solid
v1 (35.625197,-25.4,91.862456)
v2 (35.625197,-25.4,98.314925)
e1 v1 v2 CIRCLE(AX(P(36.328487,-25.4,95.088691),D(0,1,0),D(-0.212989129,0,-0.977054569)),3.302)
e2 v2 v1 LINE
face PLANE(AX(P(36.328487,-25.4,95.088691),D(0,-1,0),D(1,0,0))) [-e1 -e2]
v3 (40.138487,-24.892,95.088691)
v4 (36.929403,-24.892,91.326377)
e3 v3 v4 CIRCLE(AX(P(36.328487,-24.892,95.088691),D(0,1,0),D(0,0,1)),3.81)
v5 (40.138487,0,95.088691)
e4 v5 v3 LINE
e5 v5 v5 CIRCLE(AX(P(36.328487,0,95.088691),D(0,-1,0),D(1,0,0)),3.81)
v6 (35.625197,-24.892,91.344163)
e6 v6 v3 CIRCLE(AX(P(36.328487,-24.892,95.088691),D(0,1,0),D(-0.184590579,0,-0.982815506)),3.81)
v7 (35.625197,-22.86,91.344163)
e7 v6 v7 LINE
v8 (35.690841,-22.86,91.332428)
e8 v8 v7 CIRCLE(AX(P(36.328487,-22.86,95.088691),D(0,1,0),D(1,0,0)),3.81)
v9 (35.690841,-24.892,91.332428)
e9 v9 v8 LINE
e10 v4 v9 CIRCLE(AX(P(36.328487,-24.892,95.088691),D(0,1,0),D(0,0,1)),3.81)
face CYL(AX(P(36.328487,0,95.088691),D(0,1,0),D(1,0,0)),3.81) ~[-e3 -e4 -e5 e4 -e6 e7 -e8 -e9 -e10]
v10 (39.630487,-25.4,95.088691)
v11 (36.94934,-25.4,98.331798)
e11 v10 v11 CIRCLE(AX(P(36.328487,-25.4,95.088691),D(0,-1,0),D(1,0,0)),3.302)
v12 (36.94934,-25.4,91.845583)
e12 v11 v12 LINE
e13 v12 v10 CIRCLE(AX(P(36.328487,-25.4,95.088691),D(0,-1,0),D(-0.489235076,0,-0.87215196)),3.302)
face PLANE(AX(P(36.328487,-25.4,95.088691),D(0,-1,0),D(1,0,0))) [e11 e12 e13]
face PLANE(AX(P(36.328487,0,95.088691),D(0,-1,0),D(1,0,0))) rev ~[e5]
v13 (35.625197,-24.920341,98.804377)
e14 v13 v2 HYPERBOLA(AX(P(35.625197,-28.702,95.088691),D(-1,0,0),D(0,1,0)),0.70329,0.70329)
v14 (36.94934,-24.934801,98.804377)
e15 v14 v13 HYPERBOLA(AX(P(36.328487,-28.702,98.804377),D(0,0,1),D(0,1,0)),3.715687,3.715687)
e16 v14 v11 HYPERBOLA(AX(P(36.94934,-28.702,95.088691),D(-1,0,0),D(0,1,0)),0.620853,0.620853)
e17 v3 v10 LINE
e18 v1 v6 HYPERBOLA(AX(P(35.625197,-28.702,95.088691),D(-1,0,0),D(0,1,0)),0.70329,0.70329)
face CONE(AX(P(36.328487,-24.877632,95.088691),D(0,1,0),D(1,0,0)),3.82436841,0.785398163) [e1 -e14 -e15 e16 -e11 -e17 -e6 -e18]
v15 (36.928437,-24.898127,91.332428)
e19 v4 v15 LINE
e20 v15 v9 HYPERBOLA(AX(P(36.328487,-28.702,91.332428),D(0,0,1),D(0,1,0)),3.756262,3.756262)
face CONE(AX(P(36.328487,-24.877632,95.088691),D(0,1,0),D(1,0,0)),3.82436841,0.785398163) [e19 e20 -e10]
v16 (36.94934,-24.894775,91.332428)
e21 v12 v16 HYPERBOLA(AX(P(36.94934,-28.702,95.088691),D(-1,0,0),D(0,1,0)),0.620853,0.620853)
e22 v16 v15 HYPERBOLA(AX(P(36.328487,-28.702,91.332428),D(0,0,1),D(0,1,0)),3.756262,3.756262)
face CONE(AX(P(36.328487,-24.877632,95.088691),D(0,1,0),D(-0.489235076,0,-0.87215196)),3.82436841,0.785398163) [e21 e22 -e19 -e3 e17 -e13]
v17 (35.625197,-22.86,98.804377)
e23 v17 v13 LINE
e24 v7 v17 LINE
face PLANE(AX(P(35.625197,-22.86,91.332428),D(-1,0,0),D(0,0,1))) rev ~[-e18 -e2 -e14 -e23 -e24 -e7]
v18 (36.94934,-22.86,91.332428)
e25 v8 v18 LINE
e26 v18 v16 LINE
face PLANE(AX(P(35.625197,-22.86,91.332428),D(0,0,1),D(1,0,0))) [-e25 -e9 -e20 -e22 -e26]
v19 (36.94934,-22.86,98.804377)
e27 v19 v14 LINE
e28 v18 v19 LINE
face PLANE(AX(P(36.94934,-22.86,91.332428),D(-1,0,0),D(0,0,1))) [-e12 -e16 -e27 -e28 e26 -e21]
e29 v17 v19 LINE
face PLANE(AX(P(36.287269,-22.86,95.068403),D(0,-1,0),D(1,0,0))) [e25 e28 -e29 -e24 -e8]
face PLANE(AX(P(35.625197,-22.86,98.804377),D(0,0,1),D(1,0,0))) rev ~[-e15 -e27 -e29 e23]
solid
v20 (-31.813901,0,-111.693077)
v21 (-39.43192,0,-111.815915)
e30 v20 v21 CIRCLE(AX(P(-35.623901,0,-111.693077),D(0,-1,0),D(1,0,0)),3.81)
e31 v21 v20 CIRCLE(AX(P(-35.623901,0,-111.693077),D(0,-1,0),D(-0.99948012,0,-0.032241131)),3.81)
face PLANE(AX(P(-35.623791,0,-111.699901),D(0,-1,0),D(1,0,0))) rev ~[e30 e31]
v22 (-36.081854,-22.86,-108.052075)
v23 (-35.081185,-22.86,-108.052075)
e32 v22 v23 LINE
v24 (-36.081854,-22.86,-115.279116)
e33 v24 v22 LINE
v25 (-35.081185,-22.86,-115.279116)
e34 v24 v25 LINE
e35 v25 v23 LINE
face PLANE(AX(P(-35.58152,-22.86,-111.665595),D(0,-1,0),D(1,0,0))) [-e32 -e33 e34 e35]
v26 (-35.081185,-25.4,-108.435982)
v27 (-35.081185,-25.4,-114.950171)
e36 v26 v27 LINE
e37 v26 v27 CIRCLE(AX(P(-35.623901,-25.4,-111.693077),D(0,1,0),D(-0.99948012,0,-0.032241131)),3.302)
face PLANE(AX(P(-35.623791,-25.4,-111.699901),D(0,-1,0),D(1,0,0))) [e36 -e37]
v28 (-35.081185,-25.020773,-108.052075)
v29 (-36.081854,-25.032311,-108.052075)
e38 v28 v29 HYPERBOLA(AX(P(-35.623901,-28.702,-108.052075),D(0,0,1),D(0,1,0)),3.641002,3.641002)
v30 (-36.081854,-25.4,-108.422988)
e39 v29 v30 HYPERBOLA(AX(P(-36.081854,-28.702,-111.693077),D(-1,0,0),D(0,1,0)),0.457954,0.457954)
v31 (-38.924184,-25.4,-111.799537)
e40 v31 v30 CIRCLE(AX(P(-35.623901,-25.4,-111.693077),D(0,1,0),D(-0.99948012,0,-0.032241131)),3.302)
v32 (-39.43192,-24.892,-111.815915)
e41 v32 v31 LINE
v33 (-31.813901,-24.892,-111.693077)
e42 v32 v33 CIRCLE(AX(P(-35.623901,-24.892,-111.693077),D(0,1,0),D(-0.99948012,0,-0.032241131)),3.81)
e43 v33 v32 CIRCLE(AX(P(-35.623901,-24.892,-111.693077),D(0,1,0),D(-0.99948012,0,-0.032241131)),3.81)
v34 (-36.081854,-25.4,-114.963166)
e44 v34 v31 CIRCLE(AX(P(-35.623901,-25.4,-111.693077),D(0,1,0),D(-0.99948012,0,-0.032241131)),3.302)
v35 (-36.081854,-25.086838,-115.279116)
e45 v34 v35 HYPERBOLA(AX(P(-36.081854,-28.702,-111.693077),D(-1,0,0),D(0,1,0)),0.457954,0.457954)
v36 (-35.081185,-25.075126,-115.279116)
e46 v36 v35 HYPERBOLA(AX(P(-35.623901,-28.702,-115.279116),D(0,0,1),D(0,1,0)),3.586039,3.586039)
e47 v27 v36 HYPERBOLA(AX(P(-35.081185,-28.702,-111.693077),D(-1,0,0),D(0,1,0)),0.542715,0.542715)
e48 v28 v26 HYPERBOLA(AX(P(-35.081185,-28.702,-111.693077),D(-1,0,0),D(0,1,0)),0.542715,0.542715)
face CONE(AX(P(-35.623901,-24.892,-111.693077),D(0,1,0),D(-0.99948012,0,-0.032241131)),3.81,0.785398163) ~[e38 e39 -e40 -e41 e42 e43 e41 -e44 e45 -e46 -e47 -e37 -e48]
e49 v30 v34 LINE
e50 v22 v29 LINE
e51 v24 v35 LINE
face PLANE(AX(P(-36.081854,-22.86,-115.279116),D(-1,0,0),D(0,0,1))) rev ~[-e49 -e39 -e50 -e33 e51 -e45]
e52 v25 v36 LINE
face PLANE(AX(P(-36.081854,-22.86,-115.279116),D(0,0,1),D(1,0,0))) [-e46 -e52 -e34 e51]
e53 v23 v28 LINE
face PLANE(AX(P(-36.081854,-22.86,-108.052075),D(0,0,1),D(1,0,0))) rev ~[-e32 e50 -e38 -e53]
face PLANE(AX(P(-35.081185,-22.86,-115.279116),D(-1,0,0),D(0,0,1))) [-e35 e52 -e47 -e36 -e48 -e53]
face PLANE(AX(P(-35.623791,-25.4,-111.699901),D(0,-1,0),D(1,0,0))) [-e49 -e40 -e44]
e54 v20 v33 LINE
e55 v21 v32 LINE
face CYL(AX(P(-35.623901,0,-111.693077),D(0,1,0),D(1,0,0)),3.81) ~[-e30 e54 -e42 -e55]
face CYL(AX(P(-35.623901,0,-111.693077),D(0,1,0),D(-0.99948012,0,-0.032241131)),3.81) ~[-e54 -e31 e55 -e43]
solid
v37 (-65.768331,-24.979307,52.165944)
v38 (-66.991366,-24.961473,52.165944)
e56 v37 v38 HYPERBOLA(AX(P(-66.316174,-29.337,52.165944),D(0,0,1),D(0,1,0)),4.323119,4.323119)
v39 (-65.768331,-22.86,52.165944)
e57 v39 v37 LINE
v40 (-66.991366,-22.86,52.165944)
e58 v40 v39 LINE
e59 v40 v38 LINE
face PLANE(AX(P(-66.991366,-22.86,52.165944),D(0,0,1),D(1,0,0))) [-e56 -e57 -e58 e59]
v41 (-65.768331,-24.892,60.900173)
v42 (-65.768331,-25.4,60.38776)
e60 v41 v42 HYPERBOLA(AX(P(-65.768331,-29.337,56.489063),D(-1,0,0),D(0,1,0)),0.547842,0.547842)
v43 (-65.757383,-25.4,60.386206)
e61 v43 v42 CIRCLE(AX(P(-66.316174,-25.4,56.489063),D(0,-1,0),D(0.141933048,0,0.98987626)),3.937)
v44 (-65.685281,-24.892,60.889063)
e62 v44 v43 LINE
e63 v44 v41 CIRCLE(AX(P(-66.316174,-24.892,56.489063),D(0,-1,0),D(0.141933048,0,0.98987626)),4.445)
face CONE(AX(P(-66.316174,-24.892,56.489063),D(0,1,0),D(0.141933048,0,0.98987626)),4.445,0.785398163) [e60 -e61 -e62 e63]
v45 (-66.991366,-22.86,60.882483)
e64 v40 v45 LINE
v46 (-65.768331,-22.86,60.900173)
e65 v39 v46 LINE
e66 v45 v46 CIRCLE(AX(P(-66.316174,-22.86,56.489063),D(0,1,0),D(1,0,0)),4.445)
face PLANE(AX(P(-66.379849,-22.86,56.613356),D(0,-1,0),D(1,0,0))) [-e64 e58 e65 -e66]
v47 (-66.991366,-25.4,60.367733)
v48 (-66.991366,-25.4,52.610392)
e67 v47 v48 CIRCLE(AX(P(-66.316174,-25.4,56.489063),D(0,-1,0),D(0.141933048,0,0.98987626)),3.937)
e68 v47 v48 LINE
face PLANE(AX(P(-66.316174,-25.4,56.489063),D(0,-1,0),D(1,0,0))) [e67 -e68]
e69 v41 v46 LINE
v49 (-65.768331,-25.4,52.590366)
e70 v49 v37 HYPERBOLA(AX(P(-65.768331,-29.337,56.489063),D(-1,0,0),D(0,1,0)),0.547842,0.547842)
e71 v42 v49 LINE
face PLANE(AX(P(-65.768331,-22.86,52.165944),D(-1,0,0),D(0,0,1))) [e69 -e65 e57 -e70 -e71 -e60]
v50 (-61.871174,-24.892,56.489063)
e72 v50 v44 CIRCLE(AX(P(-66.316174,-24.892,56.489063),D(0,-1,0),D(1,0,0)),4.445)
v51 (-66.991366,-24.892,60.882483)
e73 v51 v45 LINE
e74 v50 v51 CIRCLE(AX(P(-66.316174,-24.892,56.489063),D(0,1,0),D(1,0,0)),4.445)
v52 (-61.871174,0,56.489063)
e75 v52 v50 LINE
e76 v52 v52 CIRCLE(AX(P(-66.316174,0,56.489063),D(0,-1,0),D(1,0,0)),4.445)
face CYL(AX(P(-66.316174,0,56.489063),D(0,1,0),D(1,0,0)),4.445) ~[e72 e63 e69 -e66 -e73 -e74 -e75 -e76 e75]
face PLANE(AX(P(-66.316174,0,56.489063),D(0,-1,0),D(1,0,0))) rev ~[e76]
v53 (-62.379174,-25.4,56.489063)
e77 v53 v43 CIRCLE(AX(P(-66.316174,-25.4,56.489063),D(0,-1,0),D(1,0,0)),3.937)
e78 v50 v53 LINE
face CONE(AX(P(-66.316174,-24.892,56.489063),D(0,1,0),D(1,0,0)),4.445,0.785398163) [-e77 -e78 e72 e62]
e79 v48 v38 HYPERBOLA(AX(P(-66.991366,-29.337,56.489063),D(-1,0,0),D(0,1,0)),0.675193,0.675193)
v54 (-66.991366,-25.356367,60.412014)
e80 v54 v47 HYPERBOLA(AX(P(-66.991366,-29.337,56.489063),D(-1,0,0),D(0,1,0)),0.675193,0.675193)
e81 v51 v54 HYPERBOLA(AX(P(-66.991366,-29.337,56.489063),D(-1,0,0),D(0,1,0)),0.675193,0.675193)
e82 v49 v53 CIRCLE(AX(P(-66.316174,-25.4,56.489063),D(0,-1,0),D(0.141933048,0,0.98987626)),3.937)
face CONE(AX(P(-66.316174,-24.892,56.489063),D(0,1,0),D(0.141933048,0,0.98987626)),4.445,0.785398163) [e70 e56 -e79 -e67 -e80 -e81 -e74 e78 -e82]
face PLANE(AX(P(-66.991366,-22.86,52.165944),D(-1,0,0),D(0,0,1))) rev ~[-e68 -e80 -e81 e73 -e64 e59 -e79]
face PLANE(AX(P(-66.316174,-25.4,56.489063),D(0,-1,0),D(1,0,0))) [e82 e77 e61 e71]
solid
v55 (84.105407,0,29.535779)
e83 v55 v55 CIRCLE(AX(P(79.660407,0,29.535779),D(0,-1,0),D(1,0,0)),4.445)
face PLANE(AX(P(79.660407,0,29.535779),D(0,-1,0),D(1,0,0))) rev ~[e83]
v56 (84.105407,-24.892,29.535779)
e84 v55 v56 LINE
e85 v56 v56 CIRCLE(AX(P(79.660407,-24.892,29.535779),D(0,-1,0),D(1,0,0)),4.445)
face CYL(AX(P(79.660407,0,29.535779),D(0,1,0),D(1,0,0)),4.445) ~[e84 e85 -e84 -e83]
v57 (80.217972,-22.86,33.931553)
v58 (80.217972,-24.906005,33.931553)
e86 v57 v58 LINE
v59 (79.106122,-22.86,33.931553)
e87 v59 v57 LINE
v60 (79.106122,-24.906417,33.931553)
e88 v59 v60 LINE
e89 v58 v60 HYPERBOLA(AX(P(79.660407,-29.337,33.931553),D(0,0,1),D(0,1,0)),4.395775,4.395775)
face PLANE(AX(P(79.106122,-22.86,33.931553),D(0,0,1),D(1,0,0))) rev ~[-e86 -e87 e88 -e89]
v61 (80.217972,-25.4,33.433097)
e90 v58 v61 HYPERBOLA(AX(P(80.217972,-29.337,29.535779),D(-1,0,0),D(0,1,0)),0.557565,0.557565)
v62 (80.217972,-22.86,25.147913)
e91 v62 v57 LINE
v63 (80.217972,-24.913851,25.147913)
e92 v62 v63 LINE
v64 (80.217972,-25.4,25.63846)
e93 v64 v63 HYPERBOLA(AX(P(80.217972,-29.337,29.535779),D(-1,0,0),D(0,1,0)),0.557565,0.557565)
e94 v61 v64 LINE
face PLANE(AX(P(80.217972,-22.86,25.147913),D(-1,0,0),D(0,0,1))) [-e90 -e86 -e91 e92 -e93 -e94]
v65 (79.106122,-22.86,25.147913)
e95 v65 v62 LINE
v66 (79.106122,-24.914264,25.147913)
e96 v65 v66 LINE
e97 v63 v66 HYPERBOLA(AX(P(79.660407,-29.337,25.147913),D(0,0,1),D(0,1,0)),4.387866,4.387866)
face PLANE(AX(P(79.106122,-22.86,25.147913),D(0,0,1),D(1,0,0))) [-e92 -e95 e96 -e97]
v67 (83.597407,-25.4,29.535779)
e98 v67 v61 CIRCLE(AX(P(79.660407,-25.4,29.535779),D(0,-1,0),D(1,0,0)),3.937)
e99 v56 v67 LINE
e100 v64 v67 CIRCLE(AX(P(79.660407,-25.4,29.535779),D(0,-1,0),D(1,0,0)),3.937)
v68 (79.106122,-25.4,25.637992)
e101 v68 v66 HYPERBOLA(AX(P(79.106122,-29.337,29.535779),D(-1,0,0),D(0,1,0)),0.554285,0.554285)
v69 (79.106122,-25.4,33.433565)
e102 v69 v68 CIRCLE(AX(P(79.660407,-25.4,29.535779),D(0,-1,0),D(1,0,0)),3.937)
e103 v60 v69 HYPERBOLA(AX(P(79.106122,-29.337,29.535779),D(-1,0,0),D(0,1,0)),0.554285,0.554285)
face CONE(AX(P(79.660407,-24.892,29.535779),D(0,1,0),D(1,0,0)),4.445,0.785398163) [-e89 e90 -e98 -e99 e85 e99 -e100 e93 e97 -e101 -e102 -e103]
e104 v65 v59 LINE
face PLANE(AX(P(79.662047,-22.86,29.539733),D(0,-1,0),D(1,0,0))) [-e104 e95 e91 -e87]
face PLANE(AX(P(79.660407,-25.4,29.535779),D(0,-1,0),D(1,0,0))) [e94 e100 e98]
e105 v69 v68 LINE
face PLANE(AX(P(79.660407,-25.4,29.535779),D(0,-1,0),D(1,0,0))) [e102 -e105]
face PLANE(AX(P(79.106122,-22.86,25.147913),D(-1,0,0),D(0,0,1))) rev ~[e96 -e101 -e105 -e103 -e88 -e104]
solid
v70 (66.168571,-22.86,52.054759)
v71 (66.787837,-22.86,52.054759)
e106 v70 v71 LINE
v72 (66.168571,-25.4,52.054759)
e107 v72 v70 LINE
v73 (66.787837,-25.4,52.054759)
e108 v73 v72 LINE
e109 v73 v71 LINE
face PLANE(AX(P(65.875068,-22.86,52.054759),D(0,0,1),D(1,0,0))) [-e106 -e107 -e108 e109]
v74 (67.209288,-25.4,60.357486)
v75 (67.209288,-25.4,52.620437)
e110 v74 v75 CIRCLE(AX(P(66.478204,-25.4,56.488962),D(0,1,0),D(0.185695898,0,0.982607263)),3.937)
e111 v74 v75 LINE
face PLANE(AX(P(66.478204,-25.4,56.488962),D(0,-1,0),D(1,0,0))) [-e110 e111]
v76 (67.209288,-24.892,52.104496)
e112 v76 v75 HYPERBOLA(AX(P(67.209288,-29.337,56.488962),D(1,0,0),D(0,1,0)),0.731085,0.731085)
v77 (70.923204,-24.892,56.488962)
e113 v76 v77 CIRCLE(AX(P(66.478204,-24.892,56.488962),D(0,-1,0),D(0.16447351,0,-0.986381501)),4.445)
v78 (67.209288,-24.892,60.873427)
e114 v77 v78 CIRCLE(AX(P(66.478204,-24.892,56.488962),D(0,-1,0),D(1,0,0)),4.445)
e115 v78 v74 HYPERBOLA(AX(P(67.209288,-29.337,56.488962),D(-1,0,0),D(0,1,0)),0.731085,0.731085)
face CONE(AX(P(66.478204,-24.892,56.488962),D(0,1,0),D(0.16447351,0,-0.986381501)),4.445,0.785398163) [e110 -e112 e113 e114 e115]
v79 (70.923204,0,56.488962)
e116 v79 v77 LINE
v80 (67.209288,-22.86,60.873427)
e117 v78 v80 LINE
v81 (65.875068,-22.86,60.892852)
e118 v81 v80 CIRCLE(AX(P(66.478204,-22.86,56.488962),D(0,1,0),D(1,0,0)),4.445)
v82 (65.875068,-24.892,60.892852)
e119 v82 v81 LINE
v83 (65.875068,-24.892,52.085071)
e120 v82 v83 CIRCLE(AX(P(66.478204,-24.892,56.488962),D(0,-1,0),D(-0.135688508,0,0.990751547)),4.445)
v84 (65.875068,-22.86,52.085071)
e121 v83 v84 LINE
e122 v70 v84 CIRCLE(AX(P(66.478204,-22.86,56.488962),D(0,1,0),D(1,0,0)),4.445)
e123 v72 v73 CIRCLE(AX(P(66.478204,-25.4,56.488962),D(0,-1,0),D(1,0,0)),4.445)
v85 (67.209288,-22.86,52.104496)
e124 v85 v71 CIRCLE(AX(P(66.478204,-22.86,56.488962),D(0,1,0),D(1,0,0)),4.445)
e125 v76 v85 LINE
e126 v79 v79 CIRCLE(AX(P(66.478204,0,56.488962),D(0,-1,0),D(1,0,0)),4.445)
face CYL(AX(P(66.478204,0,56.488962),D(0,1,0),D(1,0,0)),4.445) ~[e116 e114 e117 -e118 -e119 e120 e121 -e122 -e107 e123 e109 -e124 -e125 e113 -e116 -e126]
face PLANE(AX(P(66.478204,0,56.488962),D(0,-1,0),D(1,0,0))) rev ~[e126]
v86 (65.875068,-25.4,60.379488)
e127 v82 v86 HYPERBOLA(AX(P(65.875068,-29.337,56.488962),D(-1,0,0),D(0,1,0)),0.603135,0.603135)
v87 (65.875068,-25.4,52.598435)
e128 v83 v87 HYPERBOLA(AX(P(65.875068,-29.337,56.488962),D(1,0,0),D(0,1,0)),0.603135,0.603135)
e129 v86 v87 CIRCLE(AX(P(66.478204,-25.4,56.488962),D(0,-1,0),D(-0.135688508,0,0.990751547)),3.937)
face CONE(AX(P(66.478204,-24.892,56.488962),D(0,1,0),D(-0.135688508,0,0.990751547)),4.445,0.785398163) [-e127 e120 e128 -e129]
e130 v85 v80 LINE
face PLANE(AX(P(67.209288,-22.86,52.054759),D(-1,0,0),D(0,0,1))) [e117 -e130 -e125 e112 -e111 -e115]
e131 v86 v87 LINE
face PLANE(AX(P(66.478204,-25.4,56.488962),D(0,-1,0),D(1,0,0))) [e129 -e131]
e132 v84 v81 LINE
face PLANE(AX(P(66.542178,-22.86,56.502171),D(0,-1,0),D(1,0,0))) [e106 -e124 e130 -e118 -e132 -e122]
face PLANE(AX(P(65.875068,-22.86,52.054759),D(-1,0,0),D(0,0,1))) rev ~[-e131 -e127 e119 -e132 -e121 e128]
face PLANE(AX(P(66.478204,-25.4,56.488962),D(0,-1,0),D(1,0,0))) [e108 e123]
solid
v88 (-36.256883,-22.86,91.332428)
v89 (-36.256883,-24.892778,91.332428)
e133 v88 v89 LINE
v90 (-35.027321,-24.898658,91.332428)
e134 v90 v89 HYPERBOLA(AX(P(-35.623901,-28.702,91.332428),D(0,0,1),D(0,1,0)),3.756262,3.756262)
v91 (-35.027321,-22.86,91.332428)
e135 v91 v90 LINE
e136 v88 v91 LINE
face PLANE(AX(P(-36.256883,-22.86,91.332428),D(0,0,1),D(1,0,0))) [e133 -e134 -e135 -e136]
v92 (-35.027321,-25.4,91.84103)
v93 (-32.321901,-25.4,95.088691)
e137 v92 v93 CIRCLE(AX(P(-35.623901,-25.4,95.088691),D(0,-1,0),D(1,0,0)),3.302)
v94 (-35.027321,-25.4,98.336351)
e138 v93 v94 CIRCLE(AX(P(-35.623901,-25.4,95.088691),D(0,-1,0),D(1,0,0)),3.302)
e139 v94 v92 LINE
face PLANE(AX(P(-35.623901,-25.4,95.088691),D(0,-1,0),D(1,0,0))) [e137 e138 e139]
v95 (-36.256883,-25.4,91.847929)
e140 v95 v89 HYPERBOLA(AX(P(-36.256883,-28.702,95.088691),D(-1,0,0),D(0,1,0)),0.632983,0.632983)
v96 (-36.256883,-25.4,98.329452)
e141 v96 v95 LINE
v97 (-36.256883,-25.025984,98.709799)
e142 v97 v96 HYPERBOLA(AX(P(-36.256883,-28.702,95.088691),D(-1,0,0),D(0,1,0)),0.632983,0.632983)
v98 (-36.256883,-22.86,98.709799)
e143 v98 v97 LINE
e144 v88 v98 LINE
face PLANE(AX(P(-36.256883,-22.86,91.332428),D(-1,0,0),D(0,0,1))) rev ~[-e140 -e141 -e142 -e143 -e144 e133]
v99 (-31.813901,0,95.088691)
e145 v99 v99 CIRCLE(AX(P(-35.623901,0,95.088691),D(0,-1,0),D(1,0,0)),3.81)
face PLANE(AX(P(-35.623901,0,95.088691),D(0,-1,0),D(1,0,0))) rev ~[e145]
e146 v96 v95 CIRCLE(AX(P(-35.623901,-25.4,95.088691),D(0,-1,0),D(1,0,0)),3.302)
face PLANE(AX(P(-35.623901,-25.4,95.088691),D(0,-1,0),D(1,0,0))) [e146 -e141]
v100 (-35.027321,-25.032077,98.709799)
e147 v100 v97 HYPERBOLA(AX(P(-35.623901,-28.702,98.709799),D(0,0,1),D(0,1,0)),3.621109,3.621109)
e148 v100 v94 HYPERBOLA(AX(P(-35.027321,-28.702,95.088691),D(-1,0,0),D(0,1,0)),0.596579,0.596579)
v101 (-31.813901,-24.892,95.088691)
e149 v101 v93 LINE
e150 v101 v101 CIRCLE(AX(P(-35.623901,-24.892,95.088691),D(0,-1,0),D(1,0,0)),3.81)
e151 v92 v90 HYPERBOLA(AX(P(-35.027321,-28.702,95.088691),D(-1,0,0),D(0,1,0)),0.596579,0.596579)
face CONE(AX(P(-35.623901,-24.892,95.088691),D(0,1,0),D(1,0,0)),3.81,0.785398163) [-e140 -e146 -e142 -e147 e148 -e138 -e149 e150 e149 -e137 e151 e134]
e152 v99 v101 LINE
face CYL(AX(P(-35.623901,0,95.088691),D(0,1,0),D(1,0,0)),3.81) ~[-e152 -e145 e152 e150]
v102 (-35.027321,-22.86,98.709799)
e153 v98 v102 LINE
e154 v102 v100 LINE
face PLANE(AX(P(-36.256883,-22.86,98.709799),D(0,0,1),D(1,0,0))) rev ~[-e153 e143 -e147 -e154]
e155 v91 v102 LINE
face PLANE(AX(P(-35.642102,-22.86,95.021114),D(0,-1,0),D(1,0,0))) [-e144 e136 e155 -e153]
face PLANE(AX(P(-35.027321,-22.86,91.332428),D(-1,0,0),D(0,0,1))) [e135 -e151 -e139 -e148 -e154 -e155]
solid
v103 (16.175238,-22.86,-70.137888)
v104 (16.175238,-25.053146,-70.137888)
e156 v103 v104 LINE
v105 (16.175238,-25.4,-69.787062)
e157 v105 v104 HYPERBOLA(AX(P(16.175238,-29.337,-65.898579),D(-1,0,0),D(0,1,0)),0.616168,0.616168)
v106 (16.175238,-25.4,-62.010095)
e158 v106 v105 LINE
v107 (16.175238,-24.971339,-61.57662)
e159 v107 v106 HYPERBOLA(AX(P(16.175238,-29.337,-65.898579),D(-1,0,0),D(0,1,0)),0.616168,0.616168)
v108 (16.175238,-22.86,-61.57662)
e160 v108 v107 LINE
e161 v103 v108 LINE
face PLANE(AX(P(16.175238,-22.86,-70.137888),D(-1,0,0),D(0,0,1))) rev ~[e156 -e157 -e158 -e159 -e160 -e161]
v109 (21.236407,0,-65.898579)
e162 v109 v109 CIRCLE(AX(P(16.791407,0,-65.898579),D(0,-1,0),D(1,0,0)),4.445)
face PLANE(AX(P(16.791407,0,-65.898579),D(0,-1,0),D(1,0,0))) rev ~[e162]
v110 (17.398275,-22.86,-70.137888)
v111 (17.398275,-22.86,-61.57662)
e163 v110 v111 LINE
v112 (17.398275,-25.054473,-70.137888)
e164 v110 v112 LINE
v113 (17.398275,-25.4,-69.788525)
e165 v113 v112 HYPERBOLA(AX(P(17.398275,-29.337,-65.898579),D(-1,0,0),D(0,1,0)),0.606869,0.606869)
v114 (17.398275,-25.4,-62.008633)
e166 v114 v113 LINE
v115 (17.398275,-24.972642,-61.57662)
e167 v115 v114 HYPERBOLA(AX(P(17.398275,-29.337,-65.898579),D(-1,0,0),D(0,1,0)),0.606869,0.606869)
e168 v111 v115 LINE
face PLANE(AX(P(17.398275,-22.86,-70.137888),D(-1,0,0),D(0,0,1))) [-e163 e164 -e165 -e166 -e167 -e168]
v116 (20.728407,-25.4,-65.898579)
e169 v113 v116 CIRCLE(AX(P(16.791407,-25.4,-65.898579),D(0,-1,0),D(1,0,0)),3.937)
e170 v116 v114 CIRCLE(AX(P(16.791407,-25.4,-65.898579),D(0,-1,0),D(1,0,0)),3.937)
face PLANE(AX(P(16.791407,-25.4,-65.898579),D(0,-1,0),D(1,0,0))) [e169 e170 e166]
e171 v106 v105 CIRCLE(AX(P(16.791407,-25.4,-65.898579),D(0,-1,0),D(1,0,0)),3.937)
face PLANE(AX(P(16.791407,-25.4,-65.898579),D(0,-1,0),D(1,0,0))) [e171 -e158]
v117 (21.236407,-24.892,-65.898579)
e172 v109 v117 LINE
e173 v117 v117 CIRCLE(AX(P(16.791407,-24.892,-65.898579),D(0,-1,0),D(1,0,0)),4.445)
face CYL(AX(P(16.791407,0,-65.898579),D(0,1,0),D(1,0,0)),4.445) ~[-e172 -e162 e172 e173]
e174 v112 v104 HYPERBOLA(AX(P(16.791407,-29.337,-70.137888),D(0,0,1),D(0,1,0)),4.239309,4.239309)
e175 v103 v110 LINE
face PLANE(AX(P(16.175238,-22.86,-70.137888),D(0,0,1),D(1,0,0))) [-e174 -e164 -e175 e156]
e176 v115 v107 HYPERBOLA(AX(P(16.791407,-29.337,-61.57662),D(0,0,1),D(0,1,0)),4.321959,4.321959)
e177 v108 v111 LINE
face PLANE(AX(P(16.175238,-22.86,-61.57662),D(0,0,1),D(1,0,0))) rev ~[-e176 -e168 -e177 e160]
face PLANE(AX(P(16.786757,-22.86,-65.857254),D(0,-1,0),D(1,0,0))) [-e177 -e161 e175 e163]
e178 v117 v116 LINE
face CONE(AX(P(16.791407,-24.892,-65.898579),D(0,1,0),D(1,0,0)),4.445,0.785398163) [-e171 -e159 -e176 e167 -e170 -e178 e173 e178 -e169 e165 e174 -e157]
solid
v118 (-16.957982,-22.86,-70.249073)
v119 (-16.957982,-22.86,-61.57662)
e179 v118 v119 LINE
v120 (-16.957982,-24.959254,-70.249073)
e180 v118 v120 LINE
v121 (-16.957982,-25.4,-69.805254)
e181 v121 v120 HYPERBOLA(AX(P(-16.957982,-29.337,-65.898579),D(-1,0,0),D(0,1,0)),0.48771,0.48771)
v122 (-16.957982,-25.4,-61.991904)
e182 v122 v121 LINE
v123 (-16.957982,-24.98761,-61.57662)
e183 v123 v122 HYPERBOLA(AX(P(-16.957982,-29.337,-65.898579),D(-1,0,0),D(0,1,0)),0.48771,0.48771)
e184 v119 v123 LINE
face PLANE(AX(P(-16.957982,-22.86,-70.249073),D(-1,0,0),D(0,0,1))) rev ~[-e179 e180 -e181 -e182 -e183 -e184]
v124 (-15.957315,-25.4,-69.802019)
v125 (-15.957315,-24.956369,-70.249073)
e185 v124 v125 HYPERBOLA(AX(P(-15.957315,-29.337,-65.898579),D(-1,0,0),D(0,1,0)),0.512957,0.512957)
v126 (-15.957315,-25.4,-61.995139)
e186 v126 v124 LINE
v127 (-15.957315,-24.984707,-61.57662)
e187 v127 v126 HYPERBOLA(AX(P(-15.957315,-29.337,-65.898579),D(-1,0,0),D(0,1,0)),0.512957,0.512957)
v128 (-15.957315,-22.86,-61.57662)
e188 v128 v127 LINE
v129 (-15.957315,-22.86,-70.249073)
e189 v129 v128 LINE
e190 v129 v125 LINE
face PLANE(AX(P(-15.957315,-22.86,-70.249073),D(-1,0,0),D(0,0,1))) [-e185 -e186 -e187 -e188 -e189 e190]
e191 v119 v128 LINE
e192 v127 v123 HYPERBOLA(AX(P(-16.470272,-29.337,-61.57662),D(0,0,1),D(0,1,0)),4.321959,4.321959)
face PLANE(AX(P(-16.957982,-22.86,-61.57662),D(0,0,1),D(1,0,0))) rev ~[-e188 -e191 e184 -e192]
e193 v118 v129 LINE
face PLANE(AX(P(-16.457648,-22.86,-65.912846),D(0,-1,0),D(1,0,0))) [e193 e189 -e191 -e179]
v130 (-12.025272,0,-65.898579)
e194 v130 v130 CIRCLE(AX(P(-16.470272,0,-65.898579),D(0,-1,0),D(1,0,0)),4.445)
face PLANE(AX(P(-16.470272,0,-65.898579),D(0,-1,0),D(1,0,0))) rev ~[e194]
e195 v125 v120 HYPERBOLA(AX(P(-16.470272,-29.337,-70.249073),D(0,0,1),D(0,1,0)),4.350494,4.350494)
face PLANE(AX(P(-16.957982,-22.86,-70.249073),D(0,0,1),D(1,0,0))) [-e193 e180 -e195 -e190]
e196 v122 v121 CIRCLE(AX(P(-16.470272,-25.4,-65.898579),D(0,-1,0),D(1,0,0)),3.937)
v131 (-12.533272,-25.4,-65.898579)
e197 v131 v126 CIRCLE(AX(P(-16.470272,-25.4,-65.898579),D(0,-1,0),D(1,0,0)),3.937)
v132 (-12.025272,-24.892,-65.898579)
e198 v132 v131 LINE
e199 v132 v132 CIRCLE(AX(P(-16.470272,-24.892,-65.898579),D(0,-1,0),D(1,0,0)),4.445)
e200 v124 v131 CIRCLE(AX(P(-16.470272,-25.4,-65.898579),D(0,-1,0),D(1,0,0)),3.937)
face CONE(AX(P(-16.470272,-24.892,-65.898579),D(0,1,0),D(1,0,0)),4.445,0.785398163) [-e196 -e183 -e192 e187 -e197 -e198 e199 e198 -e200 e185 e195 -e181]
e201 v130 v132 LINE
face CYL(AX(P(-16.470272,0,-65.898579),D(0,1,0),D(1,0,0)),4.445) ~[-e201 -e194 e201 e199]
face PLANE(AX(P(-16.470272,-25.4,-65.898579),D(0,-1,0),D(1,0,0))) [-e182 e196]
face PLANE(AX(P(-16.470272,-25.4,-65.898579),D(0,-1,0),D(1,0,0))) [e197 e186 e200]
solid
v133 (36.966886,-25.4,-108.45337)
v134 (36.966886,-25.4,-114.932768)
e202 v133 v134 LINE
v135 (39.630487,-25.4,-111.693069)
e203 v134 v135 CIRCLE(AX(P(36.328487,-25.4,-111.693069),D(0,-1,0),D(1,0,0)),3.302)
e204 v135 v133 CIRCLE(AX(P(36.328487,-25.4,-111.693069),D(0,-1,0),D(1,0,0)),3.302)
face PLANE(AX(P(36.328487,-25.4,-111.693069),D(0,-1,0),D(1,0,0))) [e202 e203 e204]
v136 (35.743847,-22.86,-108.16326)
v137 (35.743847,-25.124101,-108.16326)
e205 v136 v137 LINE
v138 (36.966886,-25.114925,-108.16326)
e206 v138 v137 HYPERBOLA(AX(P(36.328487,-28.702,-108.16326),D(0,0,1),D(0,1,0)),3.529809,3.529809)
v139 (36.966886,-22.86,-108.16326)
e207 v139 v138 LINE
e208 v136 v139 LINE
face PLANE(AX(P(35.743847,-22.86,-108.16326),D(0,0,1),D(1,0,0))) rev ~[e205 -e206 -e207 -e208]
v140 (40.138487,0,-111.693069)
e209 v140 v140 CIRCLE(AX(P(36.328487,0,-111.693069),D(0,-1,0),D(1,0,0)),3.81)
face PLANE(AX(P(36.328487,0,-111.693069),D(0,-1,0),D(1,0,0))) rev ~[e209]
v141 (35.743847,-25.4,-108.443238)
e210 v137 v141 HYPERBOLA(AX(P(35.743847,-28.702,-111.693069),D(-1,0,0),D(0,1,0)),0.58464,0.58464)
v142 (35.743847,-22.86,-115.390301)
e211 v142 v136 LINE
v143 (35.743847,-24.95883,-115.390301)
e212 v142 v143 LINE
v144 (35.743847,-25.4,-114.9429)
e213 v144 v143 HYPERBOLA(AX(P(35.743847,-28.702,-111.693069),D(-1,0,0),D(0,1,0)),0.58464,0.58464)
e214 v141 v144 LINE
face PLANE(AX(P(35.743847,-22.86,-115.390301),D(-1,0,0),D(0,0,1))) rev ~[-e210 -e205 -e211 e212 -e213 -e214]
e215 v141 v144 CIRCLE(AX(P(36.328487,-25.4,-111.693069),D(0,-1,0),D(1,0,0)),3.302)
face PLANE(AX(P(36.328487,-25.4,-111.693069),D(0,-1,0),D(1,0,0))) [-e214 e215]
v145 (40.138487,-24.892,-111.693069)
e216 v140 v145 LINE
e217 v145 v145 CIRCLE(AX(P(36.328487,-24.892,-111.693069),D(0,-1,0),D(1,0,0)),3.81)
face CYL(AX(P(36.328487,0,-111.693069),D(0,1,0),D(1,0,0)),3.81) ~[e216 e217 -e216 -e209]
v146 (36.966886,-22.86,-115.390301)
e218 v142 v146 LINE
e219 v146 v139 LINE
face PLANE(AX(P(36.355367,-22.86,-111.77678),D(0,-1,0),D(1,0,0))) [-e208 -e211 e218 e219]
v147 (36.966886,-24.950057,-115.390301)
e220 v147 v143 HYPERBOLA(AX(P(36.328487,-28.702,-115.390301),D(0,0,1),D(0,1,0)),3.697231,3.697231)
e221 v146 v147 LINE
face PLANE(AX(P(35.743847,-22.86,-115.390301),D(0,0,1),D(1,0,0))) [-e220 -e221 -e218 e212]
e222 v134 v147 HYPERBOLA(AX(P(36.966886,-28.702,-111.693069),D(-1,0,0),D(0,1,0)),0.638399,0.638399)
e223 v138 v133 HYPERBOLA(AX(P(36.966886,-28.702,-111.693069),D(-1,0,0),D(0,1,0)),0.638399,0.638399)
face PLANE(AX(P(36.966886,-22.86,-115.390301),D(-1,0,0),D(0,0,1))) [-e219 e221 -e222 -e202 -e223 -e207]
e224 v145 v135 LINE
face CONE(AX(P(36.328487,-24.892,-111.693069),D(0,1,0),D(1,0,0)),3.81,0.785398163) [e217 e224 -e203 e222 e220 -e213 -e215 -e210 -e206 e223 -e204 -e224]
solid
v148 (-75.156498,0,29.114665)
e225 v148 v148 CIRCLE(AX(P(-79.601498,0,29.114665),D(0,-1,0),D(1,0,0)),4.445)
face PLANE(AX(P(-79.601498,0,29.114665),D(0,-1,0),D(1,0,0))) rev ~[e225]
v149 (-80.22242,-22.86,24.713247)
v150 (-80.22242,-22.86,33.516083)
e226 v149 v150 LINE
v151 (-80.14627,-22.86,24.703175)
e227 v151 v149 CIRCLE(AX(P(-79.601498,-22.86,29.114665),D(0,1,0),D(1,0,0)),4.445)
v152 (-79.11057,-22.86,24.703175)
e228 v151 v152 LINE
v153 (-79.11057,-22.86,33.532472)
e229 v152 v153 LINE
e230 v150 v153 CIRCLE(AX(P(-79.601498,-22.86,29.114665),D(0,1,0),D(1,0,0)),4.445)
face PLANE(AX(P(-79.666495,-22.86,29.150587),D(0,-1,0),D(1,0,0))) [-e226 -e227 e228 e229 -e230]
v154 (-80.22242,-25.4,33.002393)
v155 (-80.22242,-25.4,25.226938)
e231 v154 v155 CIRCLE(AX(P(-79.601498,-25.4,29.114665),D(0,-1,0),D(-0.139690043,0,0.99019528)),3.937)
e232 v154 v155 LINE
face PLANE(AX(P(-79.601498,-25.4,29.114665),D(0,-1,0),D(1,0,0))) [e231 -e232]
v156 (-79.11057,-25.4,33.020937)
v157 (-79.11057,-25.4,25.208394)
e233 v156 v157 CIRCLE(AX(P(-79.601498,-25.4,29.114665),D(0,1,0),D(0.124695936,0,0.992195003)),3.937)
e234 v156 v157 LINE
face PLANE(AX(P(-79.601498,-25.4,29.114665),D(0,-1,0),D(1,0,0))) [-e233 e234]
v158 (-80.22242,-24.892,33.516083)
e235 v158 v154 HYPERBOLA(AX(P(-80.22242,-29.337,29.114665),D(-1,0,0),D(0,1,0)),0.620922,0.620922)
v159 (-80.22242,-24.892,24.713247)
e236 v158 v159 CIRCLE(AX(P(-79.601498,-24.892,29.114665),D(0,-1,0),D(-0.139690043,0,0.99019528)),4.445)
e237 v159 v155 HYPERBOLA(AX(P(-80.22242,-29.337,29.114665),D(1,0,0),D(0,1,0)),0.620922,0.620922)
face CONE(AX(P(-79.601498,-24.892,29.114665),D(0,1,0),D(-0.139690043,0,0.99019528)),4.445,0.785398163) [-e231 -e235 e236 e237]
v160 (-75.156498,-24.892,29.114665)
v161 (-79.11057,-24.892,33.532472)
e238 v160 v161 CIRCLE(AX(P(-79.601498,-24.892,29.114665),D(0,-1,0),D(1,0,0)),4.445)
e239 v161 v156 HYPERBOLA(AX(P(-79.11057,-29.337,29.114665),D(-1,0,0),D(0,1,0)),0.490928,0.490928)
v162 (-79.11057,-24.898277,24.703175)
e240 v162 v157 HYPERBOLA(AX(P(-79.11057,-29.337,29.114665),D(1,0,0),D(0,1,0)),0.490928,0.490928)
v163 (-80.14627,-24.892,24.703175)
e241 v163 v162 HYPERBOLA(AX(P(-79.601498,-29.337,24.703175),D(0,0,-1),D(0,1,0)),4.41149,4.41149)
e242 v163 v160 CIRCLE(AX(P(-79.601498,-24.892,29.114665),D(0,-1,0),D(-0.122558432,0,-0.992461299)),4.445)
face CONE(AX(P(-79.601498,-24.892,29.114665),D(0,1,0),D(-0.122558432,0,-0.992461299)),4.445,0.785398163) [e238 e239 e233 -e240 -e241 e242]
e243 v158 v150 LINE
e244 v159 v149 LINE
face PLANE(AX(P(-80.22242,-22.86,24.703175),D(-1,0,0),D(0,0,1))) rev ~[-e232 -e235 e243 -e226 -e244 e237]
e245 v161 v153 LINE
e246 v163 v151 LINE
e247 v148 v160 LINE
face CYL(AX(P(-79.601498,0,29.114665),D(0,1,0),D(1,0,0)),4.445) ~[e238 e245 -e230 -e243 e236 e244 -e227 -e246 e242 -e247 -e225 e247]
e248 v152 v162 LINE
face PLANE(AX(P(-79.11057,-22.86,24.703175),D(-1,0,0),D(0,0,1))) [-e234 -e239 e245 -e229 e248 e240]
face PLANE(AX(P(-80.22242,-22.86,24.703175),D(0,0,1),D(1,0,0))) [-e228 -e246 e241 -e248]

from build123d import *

# Parameters (mm, degrees)
F2_DEPTH      = 25.4
F0_R          = 3.81
F1_R          = 4.445
F4_START      = 22.86
F3_W          = 1.2230351567
F3_H          = 8.8948234916
F3_W_2        = 1.1118501425
F3_W_3        = 1.334220171
F3_H_2        = 8.78364034
F3_W_4        = 1.2230370194
F3_H_3        = 8.5612684488
F3_W_5        = 1.0006669909
F3_H_4        = 8.6724534631
F3_W_6        = 1.0006688535
F3_H_5        = 7.2270408273
F3_W_7        = 1.223038882
F3_W_8        = 1.2295618653
F3_H_6        = 7.377371192
F3_W_9        = 1.3241432607
F3_H_7        = 7.4719488621
F4_DEPTH      = 23.114
F5_4_T2_ANGLE = 279.074624531
F5_4_T4_ANGLE = 119.2903176817
F5_7_C1_SIZE  = 0.508
F5_7_C2_SIZE  = 0.508
F5_8_T2_ANGLE = 278.1597188723
F5_8_T4_ANGLE = 99.7656947124
F5_9_C1_SIZE  = 0.508
F5_9_C2_SIZE  = 0.508


# Not quite as in the source:
# - a fillet or chamfer that OpenCascade refuses, or shapes differently, is made with other operations: its cross-section is extruded or revolved along the edge and cut away or added


with BuildPart() as f2:
    # F0 (on Front) → F2 (new body)
    with BuildSketch(Plane.XZ):
        with BuildLine():
            ThreePointArc((-39.431919848, -111.8159154973), (-35.5624732541, -115.5025815711), (-31.8139005923, -111.6930767894))
            ThreePointArc((-31.8139005923, -111.6930767894), (-35.6853279305, -107.8835720076), (-39.431919848, -111.8159154973))
        make_face()
    extrude(amount=F2_DEPTH)


with BuildPart() as f2b:
    # F0 (on Front) → F2, piece 2 (new body)
    with BuildSketch(Plane.XZ):
        with Locations((36.3284870982, -111.6930693388)):
            Circle(F0_R)
    extrude(amount=F2_DEPTH)


with BuildPart() as f2c:
    # F0 (on Front) → F2, piece 3 (new body)
    with BuildSketch(Plane.XZ):
        with Locations((-35.6239005923, 95.0886905193)):
            Circle(F0_R)
    extrude(amount=F2_DEPTH)


with BuildPart() as f2d:
    # F0 (on Front) → F2, piece 4 (new body)
    with BuildSketch(Plane.XZ):
        with Locations((36.3284870982, 95.0886905193)):
            Circle(F0_R)
    extrude(amount=F2_DEPTH)


with BuildPart() as f2e:
    # F1 (on Front) → F2, piece 5 (new body)
    with BuildSketch(Plane.XZ):
        with Locations((16.7914066574, -65.8985787277)):
            Circle(F1_R)
    extrude(amount=F2_DEPTH)


with BuildPart() as f2f:
    # F1 (on Front) → F2, piece 6 (new body)
    with BuildSketch(Plane.XZ):
        with Locations((-16.4702718891, -65.8985787277)):
            Circle(F1_R)
    extrude(amount=F2_DEPTH)


with BuildPart() as f2g:
    # F1 (on Front) → F2, piece 7 (new body)
    with BuildSketch(Plane.XZ):
        with Locations((-79.6014981537, 29.1146653051)):
            Circle(F1_R)
    extrude(amount=F2_DEPTH)


with BuildPart() as f2h:
    # F1 (on Front) → F2, piece 8 (new body)
    with BuildSketch(Plane.XZ):
        with Locations((-66.3161736801, 56.4890627044)):
            Circle(F1_R)
    extrude(amount=F2_DEPTH)


with BuildPart() as f2i:
    # F1 (on Front) → F2, piece 9 (new body)
    with BuildSketch(Plane.XZ):
        with Locations((66.4782037265, 56.4889616946)):
            Circle(F1_R)
    extrude(amount=F2_DEPTH)


with BuildPart() as f2j:
    # F1 (on Front) → F2, piece 10 (new body)
    with BuildSketch(Plane.XZ):
        with Locations((79.6604069033, 29.5357785845)):
            Circle(F1_R)
    extrude(amount=F2_DEPTH)


with BuildPart() as f4_tool:
    # F3 (on Front) → F4 (new body)
    with BuildSketch(Plane.XZ.offset(F4_START)):
        with Locations((-66.3798488677, 56.613355875)):
            Rectangle(F3_W, F3_H)
        with Locations((-79.6664953232, 29.1505865753)):
            Rectangle(F3_W_2, F3_H)
        with Locations((66.5421783924, 56.5021708608)):
            Rectangle(F3_W_3, F3_H)
        with Locations((79.6620473266, 29.5397331938)):
            Rectangle(F3_W_2, F3_H_2)
        with Locations((16.7867569253, -65.8572539687)):
            Rectangle(F3_W_4, F3_H_3)
        with Locations((-16.4576480165, -65.9128464758)):
            Rectangle(F3_W_5, F3_H_4)
        with Locations((-35.5815198272, -111.6655953228)):
            Rectangle(F3_W_6, F3_H_5)
        with Locations((36.3553669304, -111.7767803371)):
            Rectangle(F3_W_7, F3_H_5)
        with Locations((-35.6421023607, 95.0211137533)):
            Rectangle(F3_W_8, F3_H_6)
        with Locations((36.2872686237, 95.0684025884)):
            Rectangle(F3_W_9, F3_H_7)
    extrude(amount=F4_DEPTH)


with BuildPart() as f2_1:
    add(f2.part)

    # F4: cut by f4_tool
    add(f4_tool.part, mode=Mode.SUBTRACT)

    # F5: chamfer of 0.508 on 1 edges, made by hand

    # F5_s1 → F5_t2 (revolve, cut)
    with BuildSketch(Plane(origin=(3.5622082334, 0, -110.4290151723), x_dir=(0, 1, 0), z_dir=(0.0322411307, 0, -0.9994801196))):
        Polygon((-24.892, -43.016491512), (-25.4, -42.508491512), (-25.4, -43.016491512), align=None)
    revolve(axis=Axis((-35.6239005923, -25.4, -111.6930767894), (0, 1, 0)), mode=Mode.SUBTRACT)


with BuildPart() as f2b_1:
    add(f2b.part)

    # F4: cut by f4_tool
    add(f4_tool.part, mode=Mode.SUBTRACT)

    # F5#2: chamfer of 0.508 on 1 edges, made by hand

    # F5_2_s1 → F5_2_t2 (revolve, cut)
    with BuildSketch(Plane.XY.offset(-111.6930693388)):
        Polygon((40.1384870982, -24.892), (39.6304870982, -25.4), (40.1384870982, -25.4), align=None)
    revolve(axis=Axis((36.3284870982, -25.4, -111.6930693388), (0, -1, 0)), mode=Mode.SUBTRACT)


with BuildPart() as f2c_1:
    add(f2c.part)

    # F4: cut by f4_tool
    add(f4_tool.part, mode=Mode.SUBTRACT)

    # F5#3: chamfer of 0.508 on 1 edges, made by hand

    # F5_3_s1 → F5_3_t2 (revolve, cut)
    with BuildSketch(Plane.XY.offset(95.0886905193)):
        Polygon((-31.8139005923, -24.892), (-32.3219005923, -25.4), (-31.8139005923, -25.4), align=None)
    revolve(axis=Axis((-35.6239005923, -25.4, 95.0886905193), (0, -1, 0)), mode=Mode.SUBTRACT)


with BuildPart() as f2d_1:
    add(f2d.part)

    # F4: cut by f4_tool
    add(f4_tool.part, mode=Mode.SUBTRACT)

    # F5#4: chamfer of 0.508 on 2 edges, made by hand

    # F5_4_s1 → F5_4_t2 (revolve, cut)
    with BuildSketch(Plane.XY.offset(95.0886905193)):
        with BuildLine():
            Line((40.152855508, -24.8776315902), (39.6161186884, -25.4143684098))
            Line((39.6161186884, -25.4143684098), (39.6161186884, -25.4245284098))
            ThreePointArc((39.6161186884, -25.4245284098), (39.8773028933, -25.41016), (40.1384870982, -25.41016))
            Line((40.1384870982, -25.41016), (40.1486470982, -25.4))
            ThreePointArc((40.1486470982, -25.4), (40.1486470982, -25.1388157951), (40.163015508, -24.8776315902))
            Line((40.163015508, -24.8776315902), (40.152855508, -24.8776315902))
        make_face()
    revolve(axis=Axis((36.3284870982, -25.4, 95.0886905193), (0, -1, 0)), revolution_arc=F5_4_T2_ANGLE, mode=Mode.SUBTRACT)

    # F5_4_s3 → F5_4_t4 (revolve, cut)
    with BuildSketch(Plane(origin=(-12.9399105656, 0, 7.2586640976), x_dir=(0, 1, 0), z_dir=(-0.8721519599, 0, 0.4892350752))):
        with BuildLine():
            Line((-24.8776315902, -96.8805895099), (-25.4143684098, -97.4173263294))
            Line((-25.4143684098, -97.4173263294), (-25.4245284098, -97.4173263294))
            ThreePointArc((-25.4245284098, -97.4173263294), (-25.41016, -97.1561421246), (-25.41016, -96.8949579197))
            Line((-25.41016, -96.8949579197), (-25.4, -96.8847979197))
            ThreePointArc((-25.4, -96.8847979197), (-25.1388157951, -96.8847979197), (-24.8776315902, -96.8704295099))
            Line((-24.8776315902, -96.8704295099), (-24.8776315902, -96.8805895099))
        make_face()
    revolve(axis=Axis((36.3284870982, -25.4, 95.0886905193), (0, -1, 0)), revolution_arc=F5_4_T4_ANGLE, mode=Mode.SUBTRACT)


with BuildPart() as f2e_1:
    add(f2e.part)

    # F4: cut by f4_tool
    add(f4_tool.part, mode=Mode.SUBTRACT)

    # F5#5: chamfer of 0.508 on 1 edges, made by hand

    # F5_5_s1 → F5_5_t2 (revolve, cut)
    with BuildSketch(Plane.XY.offset(-65.8985787277)):
        Polygon((21.2364066574, -24.892), (20.7284066574, -25.4), (21.2364066574, -25.4), align=None)
    revolve(axis=Axis((16.7914066574, -25.4, -65.8985787277), (0, -1, 0)), mode=Mode.SUBTRACT)


with BuildPart() as f2f_1:
    add(f2f.part)

    # F4: cut by f4_tool
    add(f4_tool.part, mode=Mode.SUBTRACT)

    # F5#6: chamfer of 0.508 on 1 edges, made by hand

    # F5_6_s1 → F5_6_t2 (revolve, cut)
    with BuildSketch(Plane.XY.offset(-65.8985787277)):
        Polygon((-12.0252718891, -24.892), (-12.5332718891, -25.4), (-12.0252718891, -25.4), align=None)
    revolve(axis=Axis((-16.4702718891, -25.4, -65.8985787277), (0, -1, 0)), mode=Mode.SUBTRACT)


with BuildPart() as f2g_1:
    add(f2g.part)

    # F4: cut by f4_tool
    add(f4_tool.part, mode=Mode.SUBTRACT)

    # F5#7: chamfer of 0.508 on 3 edges, made by hand

    # F5_7_c1
    f5_7_c1_edges = [f2g_1.edges().sort_by_distance(p)[0] for p in [
        (-76.6573079056, -25.4, 25.7845348597),
        (-76.2893840612, -25.4, 32.0791088007),
    ]]
    chamfer(f5_7_c1_edges, length=F5_7_C1_SIZE)

    # F5_7_c2
    f5_7_c2_edges = [f2g_1.edges().sort_by_distance(p)[0] for p in [
        (-84.0464981537, -25.4, 29.1146653051),
    ]]
    chamfer(f5_7_c2_edges, length=F5_7_C2_SIZE)


with BuildPart() as f2h_1:
    add(f2h.part)

    # F4: cut by f4_tool
    add(f4_tool.part, mode=Mode.SUBTRACT)

    # F5#8: chamfer of 0.508 on 2 edges, made by hand

    # F5_8_s1 → F5_8_t2 (revolve, cut)
    with BuildSketch(Plane(origin=(-72.9167311067, 0, 10.4551389996), x_dir=(0, 1, 0), z_dir=(0.9898762599, 0, -0.1419330479))):
        Polygon((-24.892, 50.9497254588), (-25.4, 50.4417254588), (-25.4, 50.9497254588), align=None)
    revolve(axis=Axis((-66.3161736801, -25.4, 56.4890627044), (0, -1, 0)), revolution_arc=F5_8_T2_ANGLE, mode=Mode.SUBTRACT)

    # F5_8_s3 → F5_8_t4 (revolve, cut)
    with BuildSketch(Plane.XY.offset(56.4890627044)):
        Polygon((-61.8711736801, -24.892), (-62.3791736801, -25.4), (-61.8711736801, -25.4), align=None)
    revolve(axis=Axis((-66.3161736801, -25.4, 56.4890627044), (0, -1, 0)), revolution_arc=F5_8_T4_ANGLE, mode=Mode.SUBTRACT)


with BuildPart() as f2i_1:
    add(f2i.part)

    # F4: cut by f4_tool
    add(f4_tool.part, mode=Mode.SUBTRACT)

    # F5#9: chamfer of 0.508 on 3 edges, made by hand

    # F5_9_c1
    f5_9_c1_edges = [f2i_1.edges().sort_by_distance(p)[0] for p in [
        (69.8699360803, -25.4, 53.6159534036),
        (69.8699360803, -25.4, 59.3619699855),
    ]]
    chamfer(f5_9_c1_edges, length=F5_9_C1_SIZE)

    # F5_9_c2
    f5_9_c2_edges = [f2i_1.edges().sort_by_distance(p)[0] for p in [
        (62.0332037265, -25.4, 56.4889616946),
    ]]
    chamfer(f5_9_c2_edges, length=F5_9_C2_SIZE)


with BuildPart() as f2j_1:
    add(f2j.part)

    # F4: cut by f4_tool
    add(f4_tool.part, mode=Mode.SUBTRACT)

    # F5#10: chamfer of 0.508 on 1 edges, made by hand

    # F5_10_s1 → F5_10_t2 (revolve, cut)
    with BuildSketch(Plane.XY.offset(29.5357785845)):
        Polygon((84.1054069033, -24.892), (83.5974069033, -25.4), (84.1054069033, -25.4), align=None)
    revolve(axis=Axis((79.6604069033, -25.4, 29.5357785845), (0, -1, 0)), mode=Mode.SUBTRACT)


solid = Compound([f2_1.part, f2b_1.part, f2c_1.part, f2d_1.part, f2e_1.part, f2f_1.part, f2g_1.part, f2h_1.part, f2i_1.part, f2j_1.part])
